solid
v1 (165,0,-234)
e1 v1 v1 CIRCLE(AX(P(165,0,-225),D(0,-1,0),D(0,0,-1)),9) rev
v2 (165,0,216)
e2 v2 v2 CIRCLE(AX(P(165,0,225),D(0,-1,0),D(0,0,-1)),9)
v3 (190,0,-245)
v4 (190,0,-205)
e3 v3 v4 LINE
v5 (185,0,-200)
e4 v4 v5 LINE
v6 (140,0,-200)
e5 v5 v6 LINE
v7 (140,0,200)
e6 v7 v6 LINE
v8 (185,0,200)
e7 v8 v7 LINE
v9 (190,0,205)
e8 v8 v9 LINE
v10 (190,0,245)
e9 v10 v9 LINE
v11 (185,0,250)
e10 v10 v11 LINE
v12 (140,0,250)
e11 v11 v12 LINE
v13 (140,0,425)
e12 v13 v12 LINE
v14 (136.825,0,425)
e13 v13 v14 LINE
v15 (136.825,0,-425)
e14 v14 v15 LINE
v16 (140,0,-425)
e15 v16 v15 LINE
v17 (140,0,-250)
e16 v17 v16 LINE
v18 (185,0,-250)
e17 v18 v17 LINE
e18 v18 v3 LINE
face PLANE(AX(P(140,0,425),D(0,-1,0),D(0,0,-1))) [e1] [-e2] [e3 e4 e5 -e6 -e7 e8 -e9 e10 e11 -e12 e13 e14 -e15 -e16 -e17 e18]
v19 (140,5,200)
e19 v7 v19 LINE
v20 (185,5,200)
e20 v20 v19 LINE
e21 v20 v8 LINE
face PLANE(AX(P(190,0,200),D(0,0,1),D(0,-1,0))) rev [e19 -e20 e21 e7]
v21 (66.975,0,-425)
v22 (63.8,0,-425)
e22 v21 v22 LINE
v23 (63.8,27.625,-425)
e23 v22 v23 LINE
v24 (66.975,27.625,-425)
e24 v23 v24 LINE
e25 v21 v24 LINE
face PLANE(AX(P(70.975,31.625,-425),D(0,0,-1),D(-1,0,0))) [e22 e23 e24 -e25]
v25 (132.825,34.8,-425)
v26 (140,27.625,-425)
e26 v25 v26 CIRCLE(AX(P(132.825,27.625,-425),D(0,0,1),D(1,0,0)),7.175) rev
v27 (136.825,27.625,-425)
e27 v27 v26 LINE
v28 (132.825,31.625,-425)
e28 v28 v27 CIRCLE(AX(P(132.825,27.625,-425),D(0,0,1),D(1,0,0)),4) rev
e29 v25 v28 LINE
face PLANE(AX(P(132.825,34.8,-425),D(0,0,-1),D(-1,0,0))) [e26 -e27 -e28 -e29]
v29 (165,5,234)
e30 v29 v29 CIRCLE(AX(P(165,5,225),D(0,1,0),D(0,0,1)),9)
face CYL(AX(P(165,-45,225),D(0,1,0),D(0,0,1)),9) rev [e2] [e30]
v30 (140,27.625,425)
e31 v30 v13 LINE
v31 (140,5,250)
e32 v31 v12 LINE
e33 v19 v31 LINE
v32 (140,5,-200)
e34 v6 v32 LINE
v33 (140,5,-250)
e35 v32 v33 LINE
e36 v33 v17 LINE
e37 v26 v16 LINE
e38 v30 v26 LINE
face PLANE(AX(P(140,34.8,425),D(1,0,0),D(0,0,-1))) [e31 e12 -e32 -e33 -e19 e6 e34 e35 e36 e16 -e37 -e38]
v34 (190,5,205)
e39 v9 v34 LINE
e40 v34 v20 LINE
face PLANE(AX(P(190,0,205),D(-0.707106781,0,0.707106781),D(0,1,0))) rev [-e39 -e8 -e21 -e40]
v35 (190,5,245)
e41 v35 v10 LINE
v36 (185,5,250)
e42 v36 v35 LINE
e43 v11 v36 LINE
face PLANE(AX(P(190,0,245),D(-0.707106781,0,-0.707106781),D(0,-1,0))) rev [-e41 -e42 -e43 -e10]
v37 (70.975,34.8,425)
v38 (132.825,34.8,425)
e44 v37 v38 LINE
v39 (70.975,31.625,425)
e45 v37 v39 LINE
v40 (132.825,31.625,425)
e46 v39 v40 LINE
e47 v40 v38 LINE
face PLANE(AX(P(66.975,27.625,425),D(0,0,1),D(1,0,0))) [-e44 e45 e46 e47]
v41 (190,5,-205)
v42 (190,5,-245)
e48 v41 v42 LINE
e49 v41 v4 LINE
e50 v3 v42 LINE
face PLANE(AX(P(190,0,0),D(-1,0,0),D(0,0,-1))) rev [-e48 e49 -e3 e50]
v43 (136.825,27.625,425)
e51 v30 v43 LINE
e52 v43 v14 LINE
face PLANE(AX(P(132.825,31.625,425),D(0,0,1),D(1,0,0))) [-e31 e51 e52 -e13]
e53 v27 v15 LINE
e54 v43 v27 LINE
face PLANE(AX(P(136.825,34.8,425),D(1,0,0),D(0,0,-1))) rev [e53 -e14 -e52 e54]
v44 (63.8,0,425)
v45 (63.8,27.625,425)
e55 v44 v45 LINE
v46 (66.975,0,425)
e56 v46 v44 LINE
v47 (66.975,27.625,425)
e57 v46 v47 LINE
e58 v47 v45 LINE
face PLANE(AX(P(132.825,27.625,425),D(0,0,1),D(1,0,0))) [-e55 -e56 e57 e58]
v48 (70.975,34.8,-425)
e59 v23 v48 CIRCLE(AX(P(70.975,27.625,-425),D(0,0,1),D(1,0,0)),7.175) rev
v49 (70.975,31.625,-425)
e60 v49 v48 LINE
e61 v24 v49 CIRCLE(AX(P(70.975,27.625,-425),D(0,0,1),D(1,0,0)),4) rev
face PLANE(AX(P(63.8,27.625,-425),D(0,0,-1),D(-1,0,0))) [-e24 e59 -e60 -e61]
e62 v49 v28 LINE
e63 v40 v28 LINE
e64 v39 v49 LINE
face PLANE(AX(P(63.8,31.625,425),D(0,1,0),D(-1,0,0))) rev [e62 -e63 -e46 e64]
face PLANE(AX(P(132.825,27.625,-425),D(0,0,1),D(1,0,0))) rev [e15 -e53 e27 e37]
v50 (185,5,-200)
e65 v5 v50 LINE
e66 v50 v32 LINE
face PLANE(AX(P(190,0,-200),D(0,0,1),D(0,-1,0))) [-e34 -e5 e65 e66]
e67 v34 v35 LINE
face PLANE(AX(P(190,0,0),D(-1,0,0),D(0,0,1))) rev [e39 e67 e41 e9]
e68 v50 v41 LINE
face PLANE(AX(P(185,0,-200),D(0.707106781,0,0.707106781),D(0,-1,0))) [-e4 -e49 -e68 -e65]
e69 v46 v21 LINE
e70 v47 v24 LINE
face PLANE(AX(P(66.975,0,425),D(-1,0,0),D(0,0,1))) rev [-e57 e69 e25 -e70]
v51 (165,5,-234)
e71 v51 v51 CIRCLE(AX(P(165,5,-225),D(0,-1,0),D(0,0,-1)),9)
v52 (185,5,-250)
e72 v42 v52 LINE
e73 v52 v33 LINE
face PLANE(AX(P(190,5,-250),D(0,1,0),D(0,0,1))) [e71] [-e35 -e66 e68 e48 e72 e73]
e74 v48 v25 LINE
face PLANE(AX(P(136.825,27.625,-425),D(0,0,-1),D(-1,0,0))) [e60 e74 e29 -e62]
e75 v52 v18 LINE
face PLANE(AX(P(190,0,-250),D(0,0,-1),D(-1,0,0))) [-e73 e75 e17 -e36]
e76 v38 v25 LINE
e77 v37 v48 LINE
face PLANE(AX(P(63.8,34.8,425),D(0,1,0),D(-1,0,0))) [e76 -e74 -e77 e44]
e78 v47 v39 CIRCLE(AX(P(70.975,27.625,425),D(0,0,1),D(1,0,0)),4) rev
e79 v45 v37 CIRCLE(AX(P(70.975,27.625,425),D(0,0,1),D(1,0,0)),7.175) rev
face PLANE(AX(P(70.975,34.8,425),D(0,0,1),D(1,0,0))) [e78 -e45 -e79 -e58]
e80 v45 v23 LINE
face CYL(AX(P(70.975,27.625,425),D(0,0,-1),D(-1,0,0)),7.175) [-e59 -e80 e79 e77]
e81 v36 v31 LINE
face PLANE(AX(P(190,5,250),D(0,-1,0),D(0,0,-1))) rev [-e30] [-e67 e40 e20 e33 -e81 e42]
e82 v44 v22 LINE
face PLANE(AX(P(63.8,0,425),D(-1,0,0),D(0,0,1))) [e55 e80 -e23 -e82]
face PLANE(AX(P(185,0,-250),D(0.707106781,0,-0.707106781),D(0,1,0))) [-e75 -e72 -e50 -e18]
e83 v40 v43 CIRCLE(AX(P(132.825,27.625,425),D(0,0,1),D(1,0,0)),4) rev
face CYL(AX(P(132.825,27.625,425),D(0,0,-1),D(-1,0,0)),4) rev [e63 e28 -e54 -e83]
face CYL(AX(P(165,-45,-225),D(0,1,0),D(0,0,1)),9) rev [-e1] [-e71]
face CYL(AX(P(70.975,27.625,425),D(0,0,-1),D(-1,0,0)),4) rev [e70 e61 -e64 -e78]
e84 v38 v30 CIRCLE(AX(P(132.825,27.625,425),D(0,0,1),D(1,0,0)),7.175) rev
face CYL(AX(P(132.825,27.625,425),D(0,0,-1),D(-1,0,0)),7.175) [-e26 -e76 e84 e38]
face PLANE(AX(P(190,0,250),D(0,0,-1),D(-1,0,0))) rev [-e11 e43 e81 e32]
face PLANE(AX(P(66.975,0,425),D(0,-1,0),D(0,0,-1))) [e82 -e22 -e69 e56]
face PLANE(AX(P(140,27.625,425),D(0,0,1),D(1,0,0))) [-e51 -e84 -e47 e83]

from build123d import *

# Parameters (mm, degrees)
BASE_FLANGE3_DEPTH       = 425
SKETCH21_W               = 50
SKETCH21_H               = 5
BOSS_EXTRUDE2_DEPTH      = 50
CHAMFER1_SIZE            = 5
SKETCH26_R               = 9
CUT_EXTRUDE1_DEPTH       = 50
CHAMFER1_OF_MIRROR1_SIZE = 5


# Sheet-metal steps are written as plain solids
with BuildPart() as part:
    # Sketch1 → Base-Flange3 (new, symmetric)
    with BuildSketch(Plane.XY):
        with BuildLine():
            Line((63.8, 0), (63.8, 27.625))
            ThreePointArc((63.8, 27.625), (65.901508845, 32.698491155), (70.975, 34.8))
            Line((70.975, 34.8), (132.825, 34.8))
            ThreePointArc((132.825, 34.8), (137.898491155, 32.698491155), (140, 27.625))
            Line((140, 27.625), (140, 0))
            Line((140, 0), (136.825, 0))
            Line((136.825, 0), (136.825, 27.625))
            ThreePointArc((136.825, 27.625), (135.653427125, 30.453427125), (132.825, 31.625))
            Line((132.825, 31.625), (70.975, 31.625))
            ThreePointArc((70.975, 31.625), (68.146572875, 30.453427125), (66.975, 27.625))
            Line((66.975, 27.625), (66.975, 0))
            Line((66.975, 0), (63.8, 0))
        make_face()
    extrude(amount=BASE_FLANGE3_DEPTH, both=True)

    # Sketch21 → Boss-Extrude2 (add)
    with BuildSketch(Plane(origin=(140, 0, 0), x_dir=(0, 0, -1), z_dir=(1, 0, 0))):
        with Locations((-225, 2.5)):
            Rectangle(SKETCH21_W, SKETCH21_H)
    boss_extrude2 = extrude(amount=BOSS_EXTRUDE2_DEPTH)

    # Chamfer1
    chamfer1_edges = [part.edges().sort_by_distance(p)[0] for p in [
        (190, 2.5, 250),
        (190, 2.5, 200),
    ]]
    chamfer(chamfer1_edges, length=CHAMFER1_SIZE)

    # Sketch26 → Cut-Extrude1 (cut)
    with BuildSketch(Plane(origin=(0, 5, 0), x_dir=(1, 0, 0), z_dir=(0, 1, 0))):
        with Locations(Location((165, -225, 0), (0, 0, 270))):
            Circle(SKETCH26_R)
    cut_extrude1 = extrude(amount=-CUT_EXTRUDE1_DEPTH, mode=Mode.SUBTRACT)

    # Mirror1: Boss-Extrude2, Cut-Extrude1 across plane
    add(boss_extrude2.mirror(Plane.XY))
    add(cut_extrude1.mirror(Plane.XY), mode=Mode.SUBTRACT)

    # Chamfer1 of Mirror1
    chamfer1_of_mirror1_edges = [part.edges().sort_by_distance(p)[0] for p in [
        (190, 2.5, -250),
        (190, 2.5, -200),
    ]]
    chamfer(chamfer1_of_mirror1_edges, length=CHAMFER1_OF_MIRROR1_SIZE)


solid = part.part
